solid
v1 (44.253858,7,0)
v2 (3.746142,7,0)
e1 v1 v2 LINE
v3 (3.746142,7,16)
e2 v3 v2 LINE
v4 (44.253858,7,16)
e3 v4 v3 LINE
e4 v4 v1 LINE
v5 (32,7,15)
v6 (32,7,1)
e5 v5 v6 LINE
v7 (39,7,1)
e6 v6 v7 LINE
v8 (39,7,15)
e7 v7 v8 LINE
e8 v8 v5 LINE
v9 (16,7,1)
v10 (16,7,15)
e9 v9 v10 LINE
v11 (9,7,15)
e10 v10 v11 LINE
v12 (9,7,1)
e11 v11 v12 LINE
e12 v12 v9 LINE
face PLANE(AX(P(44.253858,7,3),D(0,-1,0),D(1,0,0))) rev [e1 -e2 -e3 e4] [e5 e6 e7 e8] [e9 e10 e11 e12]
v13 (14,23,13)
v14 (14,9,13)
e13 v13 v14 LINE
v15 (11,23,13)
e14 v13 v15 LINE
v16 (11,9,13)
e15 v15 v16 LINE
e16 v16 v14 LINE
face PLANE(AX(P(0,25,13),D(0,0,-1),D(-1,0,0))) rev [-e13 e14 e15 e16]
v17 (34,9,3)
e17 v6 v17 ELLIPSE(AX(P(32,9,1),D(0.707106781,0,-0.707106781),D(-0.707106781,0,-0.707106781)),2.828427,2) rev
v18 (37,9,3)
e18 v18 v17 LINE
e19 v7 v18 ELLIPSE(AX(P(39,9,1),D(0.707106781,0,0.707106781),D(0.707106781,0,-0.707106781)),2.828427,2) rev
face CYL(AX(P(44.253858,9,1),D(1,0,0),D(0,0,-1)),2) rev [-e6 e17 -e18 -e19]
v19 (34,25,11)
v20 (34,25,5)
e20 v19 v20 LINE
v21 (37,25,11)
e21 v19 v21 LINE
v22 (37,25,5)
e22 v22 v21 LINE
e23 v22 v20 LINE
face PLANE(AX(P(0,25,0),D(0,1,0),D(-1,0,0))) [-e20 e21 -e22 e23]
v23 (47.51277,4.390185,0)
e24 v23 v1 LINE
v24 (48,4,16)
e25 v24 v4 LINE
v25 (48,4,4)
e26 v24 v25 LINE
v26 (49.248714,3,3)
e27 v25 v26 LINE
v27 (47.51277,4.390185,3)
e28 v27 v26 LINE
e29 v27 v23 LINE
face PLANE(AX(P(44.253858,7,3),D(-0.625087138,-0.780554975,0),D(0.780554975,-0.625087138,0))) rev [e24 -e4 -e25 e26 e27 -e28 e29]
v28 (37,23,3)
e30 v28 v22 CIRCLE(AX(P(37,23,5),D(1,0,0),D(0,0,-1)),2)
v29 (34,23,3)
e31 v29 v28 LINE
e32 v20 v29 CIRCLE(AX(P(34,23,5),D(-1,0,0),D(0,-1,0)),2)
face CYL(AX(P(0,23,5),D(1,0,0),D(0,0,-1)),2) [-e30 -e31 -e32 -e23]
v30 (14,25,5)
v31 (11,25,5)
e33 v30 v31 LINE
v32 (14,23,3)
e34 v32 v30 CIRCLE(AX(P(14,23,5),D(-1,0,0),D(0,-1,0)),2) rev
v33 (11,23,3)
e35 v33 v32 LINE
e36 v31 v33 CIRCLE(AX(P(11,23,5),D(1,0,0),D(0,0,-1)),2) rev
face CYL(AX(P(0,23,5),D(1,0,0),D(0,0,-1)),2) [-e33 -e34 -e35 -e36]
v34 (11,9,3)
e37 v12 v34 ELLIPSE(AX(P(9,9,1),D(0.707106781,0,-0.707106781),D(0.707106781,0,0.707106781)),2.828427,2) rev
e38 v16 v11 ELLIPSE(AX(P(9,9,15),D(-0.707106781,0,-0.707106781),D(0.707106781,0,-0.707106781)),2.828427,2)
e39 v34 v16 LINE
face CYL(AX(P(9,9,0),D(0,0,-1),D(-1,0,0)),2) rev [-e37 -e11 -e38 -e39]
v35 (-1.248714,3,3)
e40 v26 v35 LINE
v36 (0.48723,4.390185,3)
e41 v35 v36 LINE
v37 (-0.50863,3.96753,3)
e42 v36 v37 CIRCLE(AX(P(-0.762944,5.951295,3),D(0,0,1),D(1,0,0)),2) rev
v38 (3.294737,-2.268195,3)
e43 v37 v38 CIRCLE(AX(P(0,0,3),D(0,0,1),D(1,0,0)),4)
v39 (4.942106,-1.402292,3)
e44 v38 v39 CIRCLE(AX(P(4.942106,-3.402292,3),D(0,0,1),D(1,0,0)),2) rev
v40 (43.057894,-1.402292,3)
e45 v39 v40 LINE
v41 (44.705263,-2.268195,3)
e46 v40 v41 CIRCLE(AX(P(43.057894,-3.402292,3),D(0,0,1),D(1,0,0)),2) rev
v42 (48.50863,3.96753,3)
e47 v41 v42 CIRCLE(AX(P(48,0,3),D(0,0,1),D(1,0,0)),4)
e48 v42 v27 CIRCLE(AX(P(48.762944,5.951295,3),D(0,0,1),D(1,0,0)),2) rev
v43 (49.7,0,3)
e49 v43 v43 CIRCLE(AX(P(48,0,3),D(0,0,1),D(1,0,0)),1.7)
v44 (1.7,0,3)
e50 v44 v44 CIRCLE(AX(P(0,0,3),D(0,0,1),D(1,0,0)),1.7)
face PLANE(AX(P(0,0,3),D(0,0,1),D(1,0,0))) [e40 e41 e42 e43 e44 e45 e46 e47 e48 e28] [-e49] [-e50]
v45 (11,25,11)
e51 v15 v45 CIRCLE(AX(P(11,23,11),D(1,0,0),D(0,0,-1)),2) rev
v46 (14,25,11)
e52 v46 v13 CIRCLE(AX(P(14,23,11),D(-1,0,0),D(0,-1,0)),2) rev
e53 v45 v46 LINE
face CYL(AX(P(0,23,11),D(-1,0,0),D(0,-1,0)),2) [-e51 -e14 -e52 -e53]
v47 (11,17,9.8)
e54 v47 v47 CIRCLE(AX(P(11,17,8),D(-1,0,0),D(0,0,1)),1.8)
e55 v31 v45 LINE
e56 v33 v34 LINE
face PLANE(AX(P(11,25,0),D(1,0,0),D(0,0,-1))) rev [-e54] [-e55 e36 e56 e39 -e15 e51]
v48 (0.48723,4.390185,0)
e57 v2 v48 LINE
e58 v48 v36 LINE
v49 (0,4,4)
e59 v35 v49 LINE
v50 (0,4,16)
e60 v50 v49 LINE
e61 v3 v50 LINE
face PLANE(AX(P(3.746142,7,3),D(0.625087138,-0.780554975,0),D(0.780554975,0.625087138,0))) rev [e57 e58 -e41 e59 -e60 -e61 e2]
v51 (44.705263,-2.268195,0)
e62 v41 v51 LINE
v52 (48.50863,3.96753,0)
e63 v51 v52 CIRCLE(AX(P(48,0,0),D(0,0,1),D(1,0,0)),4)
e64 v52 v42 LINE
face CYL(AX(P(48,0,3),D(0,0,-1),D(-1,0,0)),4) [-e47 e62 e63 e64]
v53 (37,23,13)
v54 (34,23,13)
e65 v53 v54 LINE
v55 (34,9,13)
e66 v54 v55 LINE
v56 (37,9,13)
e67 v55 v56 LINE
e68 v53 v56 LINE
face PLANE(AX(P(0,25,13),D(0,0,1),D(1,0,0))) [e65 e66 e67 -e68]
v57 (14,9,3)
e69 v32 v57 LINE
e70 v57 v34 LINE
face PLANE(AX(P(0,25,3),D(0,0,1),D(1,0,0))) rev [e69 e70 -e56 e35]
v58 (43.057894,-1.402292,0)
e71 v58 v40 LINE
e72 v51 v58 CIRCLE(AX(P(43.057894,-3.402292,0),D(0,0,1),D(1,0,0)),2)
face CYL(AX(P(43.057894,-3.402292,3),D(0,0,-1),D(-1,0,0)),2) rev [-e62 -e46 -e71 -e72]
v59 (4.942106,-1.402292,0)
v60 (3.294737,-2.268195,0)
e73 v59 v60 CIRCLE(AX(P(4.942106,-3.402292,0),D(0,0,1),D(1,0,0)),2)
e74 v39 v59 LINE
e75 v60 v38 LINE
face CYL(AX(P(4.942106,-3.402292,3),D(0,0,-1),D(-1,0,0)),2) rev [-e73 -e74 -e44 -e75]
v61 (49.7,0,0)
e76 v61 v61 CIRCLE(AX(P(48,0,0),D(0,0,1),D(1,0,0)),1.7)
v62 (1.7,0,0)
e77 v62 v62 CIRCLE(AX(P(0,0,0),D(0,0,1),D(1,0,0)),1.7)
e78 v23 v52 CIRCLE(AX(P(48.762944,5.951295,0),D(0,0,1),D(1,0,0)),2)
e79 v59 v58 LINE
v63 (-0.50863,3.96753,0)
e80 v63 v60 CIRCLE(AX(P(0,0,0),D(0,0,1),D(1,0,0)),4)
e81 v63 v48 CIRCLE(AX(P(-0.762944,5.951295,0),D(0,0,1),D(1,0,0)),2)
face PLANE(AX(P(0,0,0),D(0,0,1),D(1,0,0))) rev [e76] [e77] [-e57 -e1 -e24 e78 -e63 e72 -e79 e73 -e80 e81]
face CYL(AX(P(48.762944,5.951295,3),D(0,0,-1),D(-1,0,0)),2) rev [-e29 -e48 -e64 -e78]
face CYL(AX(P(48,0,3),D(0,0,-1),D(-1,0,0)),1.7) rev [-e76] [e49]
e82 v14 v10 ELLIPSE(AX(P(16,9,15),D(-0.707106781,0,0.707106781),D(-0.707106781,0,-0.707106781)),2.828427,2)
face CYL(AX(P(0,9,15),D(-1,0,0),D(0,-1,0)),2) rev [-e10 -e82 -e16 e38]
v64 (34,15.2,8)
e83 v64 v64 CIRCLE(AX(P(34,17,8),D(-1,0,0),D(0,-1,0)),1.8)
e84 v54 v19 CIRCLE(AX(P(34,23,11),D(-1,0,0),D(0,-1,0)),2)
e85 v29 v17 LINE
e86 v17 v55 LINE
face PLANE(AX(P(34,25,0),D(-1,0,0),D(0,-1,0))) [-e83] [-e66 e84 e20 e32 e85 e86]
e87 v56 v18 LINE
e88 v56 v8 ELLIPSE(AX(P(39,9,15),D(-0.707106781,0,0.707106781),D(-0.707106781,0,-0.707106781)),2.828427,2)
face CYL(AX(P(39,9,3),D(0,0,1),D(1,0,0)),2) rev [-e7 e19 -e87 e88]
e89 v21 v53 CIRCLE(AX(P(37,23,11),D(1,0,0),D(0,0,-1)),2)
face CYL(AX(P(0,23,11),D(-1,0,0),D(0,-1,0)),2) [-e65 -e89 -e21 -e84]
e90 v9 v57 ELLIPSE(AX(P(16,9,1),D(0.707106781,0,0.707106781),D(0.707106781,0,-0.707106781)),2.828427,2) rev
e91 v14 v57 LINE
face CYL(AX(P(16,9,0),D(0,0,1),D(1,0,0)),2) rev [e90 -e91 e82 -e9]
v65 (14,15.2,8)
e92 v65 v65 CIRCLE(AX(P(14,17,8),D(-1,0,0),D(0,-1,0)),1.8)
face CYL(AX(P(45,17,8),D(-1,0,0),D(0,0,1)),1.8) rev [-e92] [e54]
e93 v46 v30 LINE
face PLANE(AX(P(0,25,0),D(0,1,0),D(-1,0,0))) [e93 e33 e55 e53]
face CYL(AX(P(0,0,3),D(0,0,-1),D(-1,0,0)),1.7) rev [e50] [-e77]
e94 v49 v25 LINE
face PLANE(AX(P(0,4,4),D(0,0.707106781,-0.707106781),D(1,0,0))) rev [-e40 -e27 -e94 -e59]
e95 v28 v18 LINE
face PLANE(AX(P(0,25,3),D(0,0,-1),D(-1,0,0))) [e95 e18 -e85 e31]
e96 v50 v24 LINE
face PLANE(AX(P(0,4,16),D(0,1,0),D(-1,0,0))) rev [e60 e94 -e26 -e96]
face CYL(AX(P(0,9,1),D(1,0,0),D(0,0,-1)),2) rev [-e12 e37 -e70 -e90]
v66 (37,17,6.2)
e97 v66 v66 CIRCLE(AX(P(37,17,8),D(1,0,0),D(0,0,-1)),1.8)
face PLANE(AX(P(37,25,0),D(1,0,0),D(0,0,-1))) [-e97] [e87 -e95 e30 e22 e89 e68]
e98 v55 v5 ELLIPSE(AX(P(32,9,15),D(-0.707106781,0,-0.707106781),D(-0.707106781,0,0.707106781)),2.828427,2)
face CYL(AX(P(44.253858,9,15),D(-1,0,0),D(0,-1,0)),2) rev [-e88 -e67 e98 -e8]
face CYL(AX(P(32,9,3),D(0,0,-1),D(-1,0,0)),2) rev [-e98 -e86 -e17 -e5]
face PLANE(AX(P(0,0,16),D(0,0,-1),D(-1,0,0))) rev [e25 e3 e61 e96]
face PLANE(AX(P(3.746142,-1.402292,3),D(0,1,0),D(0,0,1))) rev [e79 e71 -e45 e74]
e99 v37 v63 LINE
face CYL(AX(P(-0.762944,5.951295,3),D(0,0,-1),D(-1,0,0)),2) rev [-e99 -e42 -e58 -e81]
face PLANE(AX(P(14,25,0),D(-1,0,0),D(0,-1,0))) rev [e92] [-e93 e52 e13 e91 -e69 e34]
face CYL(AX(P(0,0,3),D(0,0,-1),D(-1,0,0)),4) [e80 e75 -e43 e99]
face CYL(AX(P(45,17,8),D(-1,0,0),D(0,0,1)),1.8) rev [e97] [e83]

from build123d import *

# Parameters (mm, degrees)
SKETCH_1_R          = 1.7
EXTRUDE_1_DEPTH     = 3
EXTRUDE_2_DEPTH     = 13
EXTRUDE_3_DEPTH     = 18
SKETCH_5_R          = 1.8
CUT_EXTRUDE_1_DEPTH = 34
FILLET_1_R          = 2
CHAMFER_1_SIZE      = 1
FILLET_2_R          = 2


with BuildPart() as part:
    # Эскиз1 → Бобышка-Вытянуть1 (new body)
    with BuildSketch(Plane.XY):
        with BuildLine():
            Line((3.746141591, -1.402292116), (44.253858409, -1.402292116))
            ThreePointArc((44.253858409, -1.402292116), (51.28703274, -2.279345469), (48, 4))
            Line((48, 4), (44.253858409, 7))
            Line((44.253858409, 7), (3.746141591, 7))
            Line((3.746141591, 7), (0, 4))
            ThreePointArc((0, 4), (-3.28703274, -2.279345469), (3.746141591, -1.402292116))
        make_face()
        Circle(SKETCH_1_R, mode=Mode.SUBTRACT)
        with Locations((48, 0)):
            Circle(SKETCH_1_R, mode=Mode.SUBTRACT)
    extrude(amount=EXTRUDE_1_DEPTH)

    # Эскиз2 → Бобышка-Вытянуть2 (add)
    with BuildSketch(Plane.XY.offset(3)):
        Polygon((0, 4), (48, 4), (44.253858409, 7), (3.746141591, 7), align=None)
    extrude(amount=EXTRUDE_2_DEPTH)

    # Эскиз4 → Бобышка-Вытянуть3 (add)
    with BuildSketch(Plane(origin=(0, 7, 0), x_dir=(1, 0, 0), z_dir=(0, 1, 0))):
        Polygon((11, -13), (14, -13), (14, -8), (14, -3), (11, -3), align=None)
        Polygon((34, -8), (34, -3), (37, -3), (37, -13), (34, -13), align=None)
    extrude(amount=EXTRUDE_3_DEPTH)

    # Эскиз5 → Вырез-Вытянуть1 (cut)
    with BuildSketch(Plane.ZY.offset(-11)):
        with Locations(Location((8, 17, 0), (0, 0, 270))):
            Circle(SKETCH_5_R)
    extrude(amount=-CUT_EXTRUDE_1_DEPTH, mode=Mode.SUBTRACT)

    # Скругление1
    fillet_1_edges = [part.edges().sort_by_distance(p)[0] for p in [
        (12.5, 7, 13),
        (14, 7, 8),
        (12.5, 7, 3),
        (11, 7, 8),
        (12.5, 25, 13),
        (12.5, 25, 3),
        (35.5, 25, 13),
        (35.5, 25, 3),
        (34, 7, 8),
        (35.5, 7, 3),
        (37, 7, 8),
        (35.5, 7, 13),
    ]]
    fillet(fillet_1_edges, radius=FILLET_1_R)

    # Фаска1
    # the kernel refuses this chamfer: 1 mm, written as the material it adds along each edge
    with BuildSketch(Plane(origin=(-2.571682988, 4, 3), x_dir=(0, 0.027495876610586053, 0.9996219169112968), z_dir=(1, 0, 0))) as chamfer_1_piece_1_section:
        Polygon((CHAMFER_1_SIZE * 0.999621916911, CHAMFER_1_SIZE * 0.0274958766106), (-CHAMFER_1_SIZE * 0.0274958766106, CHAMFER_1_SIZE * 0.999621916911), (0, 0), align=None)
    chamfer_1_piece_1 = extrude(amount=53.143365976, mode=Mode.PRIVATE)
    chamfer_1_piece_1 = split(chamfer_1_piece_1, bisect_by=Plane(origin=(19.332961003, 26.957252121, 3.279224906), z_dir=(-0.6250871381508221, -0.7805549754619563, 0)), keep=Keep.TOP, mode=Mode.PRIVATE)
    chamfer_1_piece_1 = split(chamfer_1_piece_1, bisect_by=Plane(origin=(0.14685454, 4.117604636, 3.279224906), z_dir=(0.625087138150823, -0.7805549754619556, 0)), keep=Keep.TOP, mode=Mode.PRIVATE)
    add(chamfer_1_piece_1)

    # Скругление2
    fillet_2_edges = [part.edges().sort_by_distance(p)[0] for p in [
        (0, 4, 1.5),
        (48, 4, 1.5),
        (44.253858409, -1.402292116, 1.5),
        (3.746141591, -1.402292116, 1.5),
    ]]
    fillet(fillet_2_edges, radius=FILLET_2_R)


solid = part.part
